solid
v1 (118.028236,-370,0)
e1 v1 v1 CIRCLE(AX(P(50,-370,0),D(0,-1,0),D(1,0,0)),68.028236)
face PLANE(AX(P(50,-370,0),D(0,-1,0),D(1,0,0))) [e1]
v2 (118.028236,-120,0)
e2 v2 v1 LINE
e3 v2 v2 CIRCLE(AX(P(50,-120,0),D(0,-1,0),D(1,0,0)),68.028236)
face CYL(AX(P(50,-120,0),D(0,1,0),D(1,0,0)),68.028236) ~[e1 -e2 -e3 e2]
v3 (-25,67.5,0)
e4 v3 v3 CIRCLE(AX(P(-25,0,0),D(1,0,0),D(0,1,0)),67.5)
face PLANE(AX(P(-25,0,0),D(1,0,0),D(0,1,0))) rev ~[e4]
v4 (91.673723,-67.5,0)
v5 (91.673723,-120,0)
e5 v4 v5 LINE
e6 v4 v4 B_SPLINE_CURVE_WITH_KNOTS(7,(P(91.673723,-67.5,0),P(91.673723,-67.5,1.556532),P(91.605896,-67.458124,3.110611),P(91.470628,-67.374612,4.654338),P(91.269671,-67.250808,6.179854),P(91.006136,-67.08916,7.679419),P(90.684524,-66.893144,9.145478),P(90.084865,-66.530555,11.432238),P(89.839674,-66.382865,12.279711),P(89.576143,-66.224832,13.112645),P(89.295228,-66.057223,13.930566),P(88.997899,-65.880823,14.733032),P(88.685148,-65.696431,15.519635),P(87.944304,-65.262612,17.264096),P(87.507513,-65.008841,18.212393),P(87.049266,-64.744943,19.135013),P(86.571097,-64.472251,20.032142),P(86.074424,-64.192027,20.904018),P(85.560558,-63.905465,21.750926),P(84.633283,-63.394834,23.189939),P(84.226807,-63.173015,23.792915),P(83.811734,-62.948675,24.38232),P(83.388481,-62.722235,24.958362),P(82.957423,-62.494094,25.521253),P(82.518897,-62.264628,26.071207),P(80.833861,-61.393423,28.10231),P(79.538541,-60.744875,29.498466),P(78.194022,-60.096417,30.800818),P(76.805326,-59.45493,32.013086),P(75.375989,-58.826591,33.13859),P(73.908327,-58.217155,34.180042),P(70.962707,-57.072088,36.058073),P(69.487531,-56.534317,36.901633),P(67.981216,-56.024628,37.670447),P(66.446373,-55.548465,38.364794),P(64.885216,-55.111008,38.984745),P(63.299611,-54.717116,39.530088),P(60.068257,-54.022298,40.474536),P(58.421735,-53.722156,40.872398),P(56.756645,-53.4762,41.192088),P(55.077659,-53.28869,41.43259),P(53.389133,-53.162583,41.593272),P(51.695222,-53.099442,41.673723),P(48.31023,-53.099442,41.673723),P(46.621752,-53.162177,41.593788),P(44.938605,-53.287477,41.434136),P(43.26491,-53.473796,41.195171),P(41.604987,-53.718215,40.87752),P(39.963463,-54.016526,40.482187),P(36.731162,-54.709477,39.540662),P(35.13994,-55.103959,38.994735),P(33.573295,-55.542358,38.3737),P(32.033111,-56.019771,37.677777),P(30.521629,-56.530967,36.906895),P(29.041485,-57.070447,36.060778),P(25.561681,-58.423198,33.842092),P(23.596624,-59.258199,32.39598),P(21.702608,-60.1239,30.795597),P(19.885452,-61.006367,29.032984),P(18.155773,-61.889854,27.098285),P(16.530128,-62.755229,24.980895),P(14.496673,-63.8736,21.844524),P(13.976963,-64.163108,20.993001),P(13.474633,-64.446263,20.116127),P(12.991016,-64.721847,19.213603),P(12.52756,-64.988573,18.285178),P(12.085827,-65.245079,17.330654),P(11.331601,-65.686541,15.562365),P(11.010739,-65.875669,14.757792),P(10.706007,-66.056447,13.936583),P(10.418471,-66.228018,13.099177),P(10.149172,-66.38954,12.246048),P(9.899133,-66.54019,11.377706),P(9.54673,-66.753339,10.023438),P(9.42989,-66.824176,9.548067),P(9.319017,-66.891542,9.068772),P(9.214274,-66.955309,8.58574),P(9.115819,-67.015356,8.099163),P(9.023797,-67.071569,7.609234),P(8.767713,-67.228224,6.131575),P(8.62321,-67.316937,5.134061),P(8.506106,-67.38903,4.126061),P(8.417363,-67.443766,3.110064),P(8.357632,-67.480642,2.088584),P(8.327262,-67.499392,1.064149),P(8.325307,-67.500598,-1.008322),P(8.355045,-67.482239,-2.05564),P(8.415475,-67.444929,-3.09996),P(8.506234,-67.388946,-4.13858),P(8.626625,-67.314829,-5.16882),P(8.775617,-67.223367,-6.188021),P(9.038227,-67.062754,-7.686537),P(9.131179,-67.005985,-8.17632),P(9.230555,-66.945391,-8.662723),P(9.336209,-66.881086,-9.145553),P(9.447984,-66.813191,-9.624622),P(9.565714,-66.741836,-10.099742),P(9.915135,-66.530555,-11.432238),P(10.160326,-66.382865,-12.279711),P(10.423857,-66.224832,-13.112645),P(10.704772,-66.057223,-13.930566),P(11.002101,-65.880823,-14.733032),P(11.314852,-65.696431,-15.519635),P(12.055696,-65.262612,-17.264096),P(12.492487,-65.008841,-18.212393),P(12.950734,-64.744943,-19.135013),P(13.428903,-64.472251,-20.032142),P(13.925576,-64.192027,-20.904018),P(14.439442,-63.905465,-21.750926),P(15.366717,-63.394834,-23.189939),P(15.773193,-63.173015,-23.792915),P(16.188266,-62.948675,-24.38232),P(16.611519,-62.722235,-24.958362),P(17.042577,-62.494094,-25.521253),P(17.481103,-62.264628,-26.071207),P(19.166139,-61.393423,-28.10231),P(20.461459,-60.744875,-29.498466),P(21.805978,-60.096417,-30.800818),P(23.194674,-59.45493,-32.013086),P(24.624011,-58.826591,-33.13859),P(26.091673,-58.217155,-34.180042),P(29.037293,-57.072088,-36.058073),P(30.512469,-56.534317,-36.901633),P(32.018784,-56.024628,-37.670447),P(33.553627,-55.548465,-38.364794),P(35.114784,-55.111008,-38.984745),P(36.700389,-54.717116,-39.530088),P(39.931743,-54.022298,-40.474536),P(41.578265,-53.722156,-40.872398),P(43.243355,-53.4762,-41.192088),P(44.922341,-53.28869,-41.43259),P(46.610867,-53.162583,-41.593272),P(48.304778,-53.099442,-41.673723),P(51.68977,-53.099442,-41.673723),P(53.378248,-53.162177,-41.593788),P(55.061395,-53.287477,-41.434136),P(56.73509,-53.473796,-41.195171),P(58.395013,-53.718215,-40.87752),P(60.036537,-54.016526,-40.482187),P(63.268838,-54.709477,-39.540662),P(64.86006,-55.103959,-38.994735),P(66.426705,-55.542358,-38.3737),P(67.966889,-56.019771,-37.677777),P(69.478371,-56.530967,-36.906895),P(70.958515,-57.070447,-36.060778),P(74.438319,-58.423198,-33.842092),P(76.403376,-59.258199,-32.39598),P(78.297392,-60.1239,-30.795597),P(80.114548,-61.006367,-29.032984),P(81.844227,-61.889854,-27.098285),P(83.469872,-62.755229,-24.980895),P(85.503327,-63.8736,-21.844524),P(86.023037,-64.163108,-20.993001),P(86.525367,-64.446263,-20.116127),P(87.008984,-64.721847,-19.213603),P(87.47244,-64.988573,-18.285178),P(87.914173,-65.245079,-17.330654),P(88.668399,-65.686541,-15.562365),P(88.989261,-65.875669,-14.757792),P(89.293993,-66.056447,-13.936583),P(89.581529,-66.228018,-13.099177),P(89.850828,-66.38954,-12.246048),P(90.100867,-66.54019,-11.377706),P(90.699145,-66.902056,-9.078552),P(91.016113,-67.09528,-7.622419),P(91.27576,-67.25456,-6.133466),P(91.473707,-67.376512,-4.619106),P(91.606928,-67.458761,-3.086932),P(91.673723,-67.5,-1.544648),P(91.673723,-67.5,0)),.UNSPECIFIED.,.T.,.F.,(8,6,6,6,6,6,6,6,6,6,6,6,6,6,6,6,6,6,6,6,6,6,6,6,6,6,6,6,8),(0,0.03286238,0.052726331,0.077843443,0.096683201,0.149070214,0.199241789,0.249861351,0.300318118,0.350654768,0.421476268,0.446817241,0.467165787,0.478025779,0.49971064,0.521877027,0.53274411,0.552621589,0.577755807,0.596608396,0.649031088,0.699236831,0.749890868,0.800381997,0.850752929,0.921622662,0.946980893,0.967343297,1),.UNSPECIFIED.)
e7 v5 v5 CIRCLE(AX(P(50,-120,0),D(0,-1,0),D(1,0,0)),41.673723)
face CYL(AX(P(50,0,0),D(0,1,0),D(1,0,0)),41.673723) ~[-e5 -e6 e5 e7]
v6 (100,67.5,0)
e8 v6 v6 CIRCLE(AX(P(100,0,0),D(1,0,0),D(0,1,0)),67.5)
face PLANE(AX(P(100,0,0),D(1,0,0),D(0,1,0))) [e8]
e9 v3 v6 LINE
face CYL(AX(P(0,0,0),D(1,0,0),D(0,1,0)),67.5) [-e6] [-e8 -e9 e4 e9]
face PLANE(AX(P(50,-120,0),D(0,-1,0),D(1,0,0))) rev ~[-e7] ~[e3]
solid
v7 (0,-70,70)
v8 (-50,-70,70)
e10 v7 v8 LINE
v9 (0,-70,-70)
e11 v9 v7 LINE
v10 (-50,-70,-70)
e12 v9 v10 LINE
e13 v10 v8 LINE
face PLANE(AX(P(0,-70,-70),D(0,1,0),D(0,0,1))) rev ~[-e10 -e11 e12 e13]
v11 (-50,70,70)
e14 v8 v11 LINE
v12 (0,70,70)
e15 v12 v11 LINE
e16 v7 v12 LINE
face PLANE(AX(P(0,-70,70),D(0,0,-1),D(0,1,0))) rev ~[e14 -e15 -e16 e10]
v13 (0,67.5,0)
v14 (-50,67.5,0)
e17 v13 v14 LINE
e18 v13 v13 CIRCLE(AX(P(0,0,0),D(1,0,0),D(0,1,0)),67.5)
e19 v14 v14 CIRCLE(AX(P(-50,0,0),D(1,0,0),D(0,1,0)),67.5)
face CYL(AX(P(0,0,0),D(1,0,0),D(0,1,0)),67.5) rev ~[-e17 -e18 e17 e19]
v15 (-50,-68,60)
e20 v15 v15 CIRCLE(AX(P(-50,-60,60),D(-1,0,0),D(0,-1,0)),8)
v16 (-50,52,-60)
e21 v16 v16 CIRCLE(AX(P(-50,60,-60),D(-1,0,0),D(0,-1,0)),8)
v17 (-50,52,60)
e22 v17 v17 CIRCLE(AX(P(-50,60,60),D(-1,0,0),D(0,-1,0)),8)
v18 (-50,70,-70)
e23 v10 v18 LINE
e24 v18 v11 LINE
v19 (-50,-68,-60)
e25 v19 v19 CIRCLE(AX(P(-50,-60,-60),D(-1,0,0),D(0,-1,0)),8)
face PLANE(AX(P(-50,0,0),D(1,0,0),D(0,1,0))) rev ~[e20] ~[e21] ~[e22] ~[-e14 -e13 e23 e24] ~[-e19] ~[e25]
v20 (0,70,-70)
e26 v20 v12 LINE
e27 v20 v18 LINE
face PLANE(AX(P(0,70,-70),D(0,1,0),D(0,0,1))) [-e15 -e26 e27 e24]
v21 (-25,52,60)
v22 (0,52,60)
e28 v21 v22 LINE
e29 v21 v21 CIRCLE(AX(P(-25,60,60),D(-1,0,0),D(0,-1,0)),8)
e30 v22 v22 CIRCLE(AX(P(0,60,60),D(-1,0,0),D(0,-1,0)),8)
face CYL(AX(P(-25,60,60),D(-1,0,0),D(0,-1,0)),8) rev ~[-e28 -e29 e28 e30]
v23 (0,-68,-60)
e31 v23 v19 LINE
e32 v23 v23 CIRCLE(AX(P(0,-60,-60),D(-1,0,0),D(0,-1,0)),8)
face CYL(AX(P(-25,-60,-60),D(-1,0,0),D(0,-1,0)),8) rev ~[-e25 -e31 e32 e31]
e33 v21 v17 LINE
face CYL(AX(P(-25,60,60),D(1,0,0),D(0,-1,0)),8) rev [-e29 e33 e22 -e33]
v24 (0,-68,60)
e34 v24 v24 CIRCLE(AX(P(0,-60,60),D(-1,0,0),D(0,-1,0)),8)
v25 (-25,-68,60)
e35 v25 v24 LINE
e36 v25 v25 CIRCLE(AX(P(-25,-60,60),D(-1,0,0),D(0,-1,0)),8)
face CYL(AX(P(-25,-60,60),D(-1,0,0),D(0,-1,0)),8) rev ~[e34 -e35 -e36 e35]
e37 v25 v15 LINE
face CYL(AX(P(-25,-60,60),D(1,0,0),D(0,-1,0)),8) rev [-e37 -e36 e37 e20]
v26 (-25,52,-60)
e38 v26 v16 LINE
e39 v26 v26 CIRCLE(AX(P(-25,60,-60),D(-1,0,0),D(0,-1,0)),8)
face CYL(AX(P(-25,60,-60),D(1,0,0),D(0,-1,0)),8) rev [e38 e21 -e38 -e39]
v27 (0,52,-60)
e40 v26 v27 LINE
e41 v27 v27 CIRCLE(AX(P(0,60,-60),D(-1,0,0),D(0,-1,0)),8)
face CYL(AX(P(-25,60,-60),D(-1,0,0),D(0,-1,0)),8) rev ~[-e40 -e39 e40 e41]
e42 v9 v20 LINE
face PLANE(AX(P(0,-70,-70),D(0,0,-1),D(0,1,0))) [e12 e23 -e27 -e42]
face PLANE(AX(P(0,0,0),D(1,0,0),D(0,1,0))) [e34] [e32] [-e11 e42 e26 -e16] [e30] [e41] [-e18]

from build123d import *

# Parameters (mm, degrees)
F0_W          = 140
F0_H          = 140
F0_R          = 67.5
F1_DEPTH      = 50
F2_R          = 67.5
F3_DEPTH      = 100
F3_DEPTH_BACK = 25
F4_R          = 41.6737233106
F5_DEPTH      = 120
F6_R          = 68.028235637
F6_R_2        = 41.6737233106
F7_DEPTH      = 250
F8_DEPTH      = 370
F9_R          = 8
F10_DEPTH     = 25


with BuildPart() as f1:
    # F0 (on Right) → F1 (new body)
    with BuildSketch(Plane.YZ):
        Rectangle(F0_W, F0_H)
        Circle(F0_R, mode=Mode.SUBTRACT)
    extrude(amount=-F1_DEPTH)

    # F9 (on face) → F10 (cut, symmetric)
    with BuildSketch(Plane(origin=(-25, 0, 0), x_dir=(0, -1, 0), z_dir=(-1, 0, 0))):
        with Locations((60, 60)):
            Circle(F9_R)
        with Locations((-60, 60)):
            Circle(F9_R)
        with Locations((-60, -60)):
            Circle(F9_R)
        with Locations((60, -60)):
            Circle(F9_R)
    extrude(amount=F10_DEPTH, both=True, mode=Mode.SUBTRACT)


with BuildPart() as f3:
    # F2 (on face) → F3 (new body, two sides)
    with BuildSketch(Plane.YZ) as f3_sk:
        Circle(F2_R)
    extrude(amount=F3_DEPTH)
    extrude(f3_sk.sketch, amount=-F3_DEPTH_BACK)

    # F4 (on Front) → F5 (join)
    with BuildSketch(Plane.XZ):
        with Locations((50, 0)):
            Circle(F4_R)
    extrude(amount=F5_DEPTH)

    # F6 (on face) → F7 (join)
    with BuildSketch(Plane.XZ.offset(120)):
        with Locations((50, 0)):
            Circle(F6_R)
        with Locations((50, 0)):
            Circle(F6_R_2, mode=Mode.SUBTRACT)
    extrude(amount=F7_DEPTH)

    # F4 (on Front) → F8 (join, through all)
    with BuildSketch(Plane.XZ):
        with Locations((50, 0)):
            Circle(F4_R)
    extrude(amount=F8_DEPTH)


solid = Compound([f1.part, f3.part])
